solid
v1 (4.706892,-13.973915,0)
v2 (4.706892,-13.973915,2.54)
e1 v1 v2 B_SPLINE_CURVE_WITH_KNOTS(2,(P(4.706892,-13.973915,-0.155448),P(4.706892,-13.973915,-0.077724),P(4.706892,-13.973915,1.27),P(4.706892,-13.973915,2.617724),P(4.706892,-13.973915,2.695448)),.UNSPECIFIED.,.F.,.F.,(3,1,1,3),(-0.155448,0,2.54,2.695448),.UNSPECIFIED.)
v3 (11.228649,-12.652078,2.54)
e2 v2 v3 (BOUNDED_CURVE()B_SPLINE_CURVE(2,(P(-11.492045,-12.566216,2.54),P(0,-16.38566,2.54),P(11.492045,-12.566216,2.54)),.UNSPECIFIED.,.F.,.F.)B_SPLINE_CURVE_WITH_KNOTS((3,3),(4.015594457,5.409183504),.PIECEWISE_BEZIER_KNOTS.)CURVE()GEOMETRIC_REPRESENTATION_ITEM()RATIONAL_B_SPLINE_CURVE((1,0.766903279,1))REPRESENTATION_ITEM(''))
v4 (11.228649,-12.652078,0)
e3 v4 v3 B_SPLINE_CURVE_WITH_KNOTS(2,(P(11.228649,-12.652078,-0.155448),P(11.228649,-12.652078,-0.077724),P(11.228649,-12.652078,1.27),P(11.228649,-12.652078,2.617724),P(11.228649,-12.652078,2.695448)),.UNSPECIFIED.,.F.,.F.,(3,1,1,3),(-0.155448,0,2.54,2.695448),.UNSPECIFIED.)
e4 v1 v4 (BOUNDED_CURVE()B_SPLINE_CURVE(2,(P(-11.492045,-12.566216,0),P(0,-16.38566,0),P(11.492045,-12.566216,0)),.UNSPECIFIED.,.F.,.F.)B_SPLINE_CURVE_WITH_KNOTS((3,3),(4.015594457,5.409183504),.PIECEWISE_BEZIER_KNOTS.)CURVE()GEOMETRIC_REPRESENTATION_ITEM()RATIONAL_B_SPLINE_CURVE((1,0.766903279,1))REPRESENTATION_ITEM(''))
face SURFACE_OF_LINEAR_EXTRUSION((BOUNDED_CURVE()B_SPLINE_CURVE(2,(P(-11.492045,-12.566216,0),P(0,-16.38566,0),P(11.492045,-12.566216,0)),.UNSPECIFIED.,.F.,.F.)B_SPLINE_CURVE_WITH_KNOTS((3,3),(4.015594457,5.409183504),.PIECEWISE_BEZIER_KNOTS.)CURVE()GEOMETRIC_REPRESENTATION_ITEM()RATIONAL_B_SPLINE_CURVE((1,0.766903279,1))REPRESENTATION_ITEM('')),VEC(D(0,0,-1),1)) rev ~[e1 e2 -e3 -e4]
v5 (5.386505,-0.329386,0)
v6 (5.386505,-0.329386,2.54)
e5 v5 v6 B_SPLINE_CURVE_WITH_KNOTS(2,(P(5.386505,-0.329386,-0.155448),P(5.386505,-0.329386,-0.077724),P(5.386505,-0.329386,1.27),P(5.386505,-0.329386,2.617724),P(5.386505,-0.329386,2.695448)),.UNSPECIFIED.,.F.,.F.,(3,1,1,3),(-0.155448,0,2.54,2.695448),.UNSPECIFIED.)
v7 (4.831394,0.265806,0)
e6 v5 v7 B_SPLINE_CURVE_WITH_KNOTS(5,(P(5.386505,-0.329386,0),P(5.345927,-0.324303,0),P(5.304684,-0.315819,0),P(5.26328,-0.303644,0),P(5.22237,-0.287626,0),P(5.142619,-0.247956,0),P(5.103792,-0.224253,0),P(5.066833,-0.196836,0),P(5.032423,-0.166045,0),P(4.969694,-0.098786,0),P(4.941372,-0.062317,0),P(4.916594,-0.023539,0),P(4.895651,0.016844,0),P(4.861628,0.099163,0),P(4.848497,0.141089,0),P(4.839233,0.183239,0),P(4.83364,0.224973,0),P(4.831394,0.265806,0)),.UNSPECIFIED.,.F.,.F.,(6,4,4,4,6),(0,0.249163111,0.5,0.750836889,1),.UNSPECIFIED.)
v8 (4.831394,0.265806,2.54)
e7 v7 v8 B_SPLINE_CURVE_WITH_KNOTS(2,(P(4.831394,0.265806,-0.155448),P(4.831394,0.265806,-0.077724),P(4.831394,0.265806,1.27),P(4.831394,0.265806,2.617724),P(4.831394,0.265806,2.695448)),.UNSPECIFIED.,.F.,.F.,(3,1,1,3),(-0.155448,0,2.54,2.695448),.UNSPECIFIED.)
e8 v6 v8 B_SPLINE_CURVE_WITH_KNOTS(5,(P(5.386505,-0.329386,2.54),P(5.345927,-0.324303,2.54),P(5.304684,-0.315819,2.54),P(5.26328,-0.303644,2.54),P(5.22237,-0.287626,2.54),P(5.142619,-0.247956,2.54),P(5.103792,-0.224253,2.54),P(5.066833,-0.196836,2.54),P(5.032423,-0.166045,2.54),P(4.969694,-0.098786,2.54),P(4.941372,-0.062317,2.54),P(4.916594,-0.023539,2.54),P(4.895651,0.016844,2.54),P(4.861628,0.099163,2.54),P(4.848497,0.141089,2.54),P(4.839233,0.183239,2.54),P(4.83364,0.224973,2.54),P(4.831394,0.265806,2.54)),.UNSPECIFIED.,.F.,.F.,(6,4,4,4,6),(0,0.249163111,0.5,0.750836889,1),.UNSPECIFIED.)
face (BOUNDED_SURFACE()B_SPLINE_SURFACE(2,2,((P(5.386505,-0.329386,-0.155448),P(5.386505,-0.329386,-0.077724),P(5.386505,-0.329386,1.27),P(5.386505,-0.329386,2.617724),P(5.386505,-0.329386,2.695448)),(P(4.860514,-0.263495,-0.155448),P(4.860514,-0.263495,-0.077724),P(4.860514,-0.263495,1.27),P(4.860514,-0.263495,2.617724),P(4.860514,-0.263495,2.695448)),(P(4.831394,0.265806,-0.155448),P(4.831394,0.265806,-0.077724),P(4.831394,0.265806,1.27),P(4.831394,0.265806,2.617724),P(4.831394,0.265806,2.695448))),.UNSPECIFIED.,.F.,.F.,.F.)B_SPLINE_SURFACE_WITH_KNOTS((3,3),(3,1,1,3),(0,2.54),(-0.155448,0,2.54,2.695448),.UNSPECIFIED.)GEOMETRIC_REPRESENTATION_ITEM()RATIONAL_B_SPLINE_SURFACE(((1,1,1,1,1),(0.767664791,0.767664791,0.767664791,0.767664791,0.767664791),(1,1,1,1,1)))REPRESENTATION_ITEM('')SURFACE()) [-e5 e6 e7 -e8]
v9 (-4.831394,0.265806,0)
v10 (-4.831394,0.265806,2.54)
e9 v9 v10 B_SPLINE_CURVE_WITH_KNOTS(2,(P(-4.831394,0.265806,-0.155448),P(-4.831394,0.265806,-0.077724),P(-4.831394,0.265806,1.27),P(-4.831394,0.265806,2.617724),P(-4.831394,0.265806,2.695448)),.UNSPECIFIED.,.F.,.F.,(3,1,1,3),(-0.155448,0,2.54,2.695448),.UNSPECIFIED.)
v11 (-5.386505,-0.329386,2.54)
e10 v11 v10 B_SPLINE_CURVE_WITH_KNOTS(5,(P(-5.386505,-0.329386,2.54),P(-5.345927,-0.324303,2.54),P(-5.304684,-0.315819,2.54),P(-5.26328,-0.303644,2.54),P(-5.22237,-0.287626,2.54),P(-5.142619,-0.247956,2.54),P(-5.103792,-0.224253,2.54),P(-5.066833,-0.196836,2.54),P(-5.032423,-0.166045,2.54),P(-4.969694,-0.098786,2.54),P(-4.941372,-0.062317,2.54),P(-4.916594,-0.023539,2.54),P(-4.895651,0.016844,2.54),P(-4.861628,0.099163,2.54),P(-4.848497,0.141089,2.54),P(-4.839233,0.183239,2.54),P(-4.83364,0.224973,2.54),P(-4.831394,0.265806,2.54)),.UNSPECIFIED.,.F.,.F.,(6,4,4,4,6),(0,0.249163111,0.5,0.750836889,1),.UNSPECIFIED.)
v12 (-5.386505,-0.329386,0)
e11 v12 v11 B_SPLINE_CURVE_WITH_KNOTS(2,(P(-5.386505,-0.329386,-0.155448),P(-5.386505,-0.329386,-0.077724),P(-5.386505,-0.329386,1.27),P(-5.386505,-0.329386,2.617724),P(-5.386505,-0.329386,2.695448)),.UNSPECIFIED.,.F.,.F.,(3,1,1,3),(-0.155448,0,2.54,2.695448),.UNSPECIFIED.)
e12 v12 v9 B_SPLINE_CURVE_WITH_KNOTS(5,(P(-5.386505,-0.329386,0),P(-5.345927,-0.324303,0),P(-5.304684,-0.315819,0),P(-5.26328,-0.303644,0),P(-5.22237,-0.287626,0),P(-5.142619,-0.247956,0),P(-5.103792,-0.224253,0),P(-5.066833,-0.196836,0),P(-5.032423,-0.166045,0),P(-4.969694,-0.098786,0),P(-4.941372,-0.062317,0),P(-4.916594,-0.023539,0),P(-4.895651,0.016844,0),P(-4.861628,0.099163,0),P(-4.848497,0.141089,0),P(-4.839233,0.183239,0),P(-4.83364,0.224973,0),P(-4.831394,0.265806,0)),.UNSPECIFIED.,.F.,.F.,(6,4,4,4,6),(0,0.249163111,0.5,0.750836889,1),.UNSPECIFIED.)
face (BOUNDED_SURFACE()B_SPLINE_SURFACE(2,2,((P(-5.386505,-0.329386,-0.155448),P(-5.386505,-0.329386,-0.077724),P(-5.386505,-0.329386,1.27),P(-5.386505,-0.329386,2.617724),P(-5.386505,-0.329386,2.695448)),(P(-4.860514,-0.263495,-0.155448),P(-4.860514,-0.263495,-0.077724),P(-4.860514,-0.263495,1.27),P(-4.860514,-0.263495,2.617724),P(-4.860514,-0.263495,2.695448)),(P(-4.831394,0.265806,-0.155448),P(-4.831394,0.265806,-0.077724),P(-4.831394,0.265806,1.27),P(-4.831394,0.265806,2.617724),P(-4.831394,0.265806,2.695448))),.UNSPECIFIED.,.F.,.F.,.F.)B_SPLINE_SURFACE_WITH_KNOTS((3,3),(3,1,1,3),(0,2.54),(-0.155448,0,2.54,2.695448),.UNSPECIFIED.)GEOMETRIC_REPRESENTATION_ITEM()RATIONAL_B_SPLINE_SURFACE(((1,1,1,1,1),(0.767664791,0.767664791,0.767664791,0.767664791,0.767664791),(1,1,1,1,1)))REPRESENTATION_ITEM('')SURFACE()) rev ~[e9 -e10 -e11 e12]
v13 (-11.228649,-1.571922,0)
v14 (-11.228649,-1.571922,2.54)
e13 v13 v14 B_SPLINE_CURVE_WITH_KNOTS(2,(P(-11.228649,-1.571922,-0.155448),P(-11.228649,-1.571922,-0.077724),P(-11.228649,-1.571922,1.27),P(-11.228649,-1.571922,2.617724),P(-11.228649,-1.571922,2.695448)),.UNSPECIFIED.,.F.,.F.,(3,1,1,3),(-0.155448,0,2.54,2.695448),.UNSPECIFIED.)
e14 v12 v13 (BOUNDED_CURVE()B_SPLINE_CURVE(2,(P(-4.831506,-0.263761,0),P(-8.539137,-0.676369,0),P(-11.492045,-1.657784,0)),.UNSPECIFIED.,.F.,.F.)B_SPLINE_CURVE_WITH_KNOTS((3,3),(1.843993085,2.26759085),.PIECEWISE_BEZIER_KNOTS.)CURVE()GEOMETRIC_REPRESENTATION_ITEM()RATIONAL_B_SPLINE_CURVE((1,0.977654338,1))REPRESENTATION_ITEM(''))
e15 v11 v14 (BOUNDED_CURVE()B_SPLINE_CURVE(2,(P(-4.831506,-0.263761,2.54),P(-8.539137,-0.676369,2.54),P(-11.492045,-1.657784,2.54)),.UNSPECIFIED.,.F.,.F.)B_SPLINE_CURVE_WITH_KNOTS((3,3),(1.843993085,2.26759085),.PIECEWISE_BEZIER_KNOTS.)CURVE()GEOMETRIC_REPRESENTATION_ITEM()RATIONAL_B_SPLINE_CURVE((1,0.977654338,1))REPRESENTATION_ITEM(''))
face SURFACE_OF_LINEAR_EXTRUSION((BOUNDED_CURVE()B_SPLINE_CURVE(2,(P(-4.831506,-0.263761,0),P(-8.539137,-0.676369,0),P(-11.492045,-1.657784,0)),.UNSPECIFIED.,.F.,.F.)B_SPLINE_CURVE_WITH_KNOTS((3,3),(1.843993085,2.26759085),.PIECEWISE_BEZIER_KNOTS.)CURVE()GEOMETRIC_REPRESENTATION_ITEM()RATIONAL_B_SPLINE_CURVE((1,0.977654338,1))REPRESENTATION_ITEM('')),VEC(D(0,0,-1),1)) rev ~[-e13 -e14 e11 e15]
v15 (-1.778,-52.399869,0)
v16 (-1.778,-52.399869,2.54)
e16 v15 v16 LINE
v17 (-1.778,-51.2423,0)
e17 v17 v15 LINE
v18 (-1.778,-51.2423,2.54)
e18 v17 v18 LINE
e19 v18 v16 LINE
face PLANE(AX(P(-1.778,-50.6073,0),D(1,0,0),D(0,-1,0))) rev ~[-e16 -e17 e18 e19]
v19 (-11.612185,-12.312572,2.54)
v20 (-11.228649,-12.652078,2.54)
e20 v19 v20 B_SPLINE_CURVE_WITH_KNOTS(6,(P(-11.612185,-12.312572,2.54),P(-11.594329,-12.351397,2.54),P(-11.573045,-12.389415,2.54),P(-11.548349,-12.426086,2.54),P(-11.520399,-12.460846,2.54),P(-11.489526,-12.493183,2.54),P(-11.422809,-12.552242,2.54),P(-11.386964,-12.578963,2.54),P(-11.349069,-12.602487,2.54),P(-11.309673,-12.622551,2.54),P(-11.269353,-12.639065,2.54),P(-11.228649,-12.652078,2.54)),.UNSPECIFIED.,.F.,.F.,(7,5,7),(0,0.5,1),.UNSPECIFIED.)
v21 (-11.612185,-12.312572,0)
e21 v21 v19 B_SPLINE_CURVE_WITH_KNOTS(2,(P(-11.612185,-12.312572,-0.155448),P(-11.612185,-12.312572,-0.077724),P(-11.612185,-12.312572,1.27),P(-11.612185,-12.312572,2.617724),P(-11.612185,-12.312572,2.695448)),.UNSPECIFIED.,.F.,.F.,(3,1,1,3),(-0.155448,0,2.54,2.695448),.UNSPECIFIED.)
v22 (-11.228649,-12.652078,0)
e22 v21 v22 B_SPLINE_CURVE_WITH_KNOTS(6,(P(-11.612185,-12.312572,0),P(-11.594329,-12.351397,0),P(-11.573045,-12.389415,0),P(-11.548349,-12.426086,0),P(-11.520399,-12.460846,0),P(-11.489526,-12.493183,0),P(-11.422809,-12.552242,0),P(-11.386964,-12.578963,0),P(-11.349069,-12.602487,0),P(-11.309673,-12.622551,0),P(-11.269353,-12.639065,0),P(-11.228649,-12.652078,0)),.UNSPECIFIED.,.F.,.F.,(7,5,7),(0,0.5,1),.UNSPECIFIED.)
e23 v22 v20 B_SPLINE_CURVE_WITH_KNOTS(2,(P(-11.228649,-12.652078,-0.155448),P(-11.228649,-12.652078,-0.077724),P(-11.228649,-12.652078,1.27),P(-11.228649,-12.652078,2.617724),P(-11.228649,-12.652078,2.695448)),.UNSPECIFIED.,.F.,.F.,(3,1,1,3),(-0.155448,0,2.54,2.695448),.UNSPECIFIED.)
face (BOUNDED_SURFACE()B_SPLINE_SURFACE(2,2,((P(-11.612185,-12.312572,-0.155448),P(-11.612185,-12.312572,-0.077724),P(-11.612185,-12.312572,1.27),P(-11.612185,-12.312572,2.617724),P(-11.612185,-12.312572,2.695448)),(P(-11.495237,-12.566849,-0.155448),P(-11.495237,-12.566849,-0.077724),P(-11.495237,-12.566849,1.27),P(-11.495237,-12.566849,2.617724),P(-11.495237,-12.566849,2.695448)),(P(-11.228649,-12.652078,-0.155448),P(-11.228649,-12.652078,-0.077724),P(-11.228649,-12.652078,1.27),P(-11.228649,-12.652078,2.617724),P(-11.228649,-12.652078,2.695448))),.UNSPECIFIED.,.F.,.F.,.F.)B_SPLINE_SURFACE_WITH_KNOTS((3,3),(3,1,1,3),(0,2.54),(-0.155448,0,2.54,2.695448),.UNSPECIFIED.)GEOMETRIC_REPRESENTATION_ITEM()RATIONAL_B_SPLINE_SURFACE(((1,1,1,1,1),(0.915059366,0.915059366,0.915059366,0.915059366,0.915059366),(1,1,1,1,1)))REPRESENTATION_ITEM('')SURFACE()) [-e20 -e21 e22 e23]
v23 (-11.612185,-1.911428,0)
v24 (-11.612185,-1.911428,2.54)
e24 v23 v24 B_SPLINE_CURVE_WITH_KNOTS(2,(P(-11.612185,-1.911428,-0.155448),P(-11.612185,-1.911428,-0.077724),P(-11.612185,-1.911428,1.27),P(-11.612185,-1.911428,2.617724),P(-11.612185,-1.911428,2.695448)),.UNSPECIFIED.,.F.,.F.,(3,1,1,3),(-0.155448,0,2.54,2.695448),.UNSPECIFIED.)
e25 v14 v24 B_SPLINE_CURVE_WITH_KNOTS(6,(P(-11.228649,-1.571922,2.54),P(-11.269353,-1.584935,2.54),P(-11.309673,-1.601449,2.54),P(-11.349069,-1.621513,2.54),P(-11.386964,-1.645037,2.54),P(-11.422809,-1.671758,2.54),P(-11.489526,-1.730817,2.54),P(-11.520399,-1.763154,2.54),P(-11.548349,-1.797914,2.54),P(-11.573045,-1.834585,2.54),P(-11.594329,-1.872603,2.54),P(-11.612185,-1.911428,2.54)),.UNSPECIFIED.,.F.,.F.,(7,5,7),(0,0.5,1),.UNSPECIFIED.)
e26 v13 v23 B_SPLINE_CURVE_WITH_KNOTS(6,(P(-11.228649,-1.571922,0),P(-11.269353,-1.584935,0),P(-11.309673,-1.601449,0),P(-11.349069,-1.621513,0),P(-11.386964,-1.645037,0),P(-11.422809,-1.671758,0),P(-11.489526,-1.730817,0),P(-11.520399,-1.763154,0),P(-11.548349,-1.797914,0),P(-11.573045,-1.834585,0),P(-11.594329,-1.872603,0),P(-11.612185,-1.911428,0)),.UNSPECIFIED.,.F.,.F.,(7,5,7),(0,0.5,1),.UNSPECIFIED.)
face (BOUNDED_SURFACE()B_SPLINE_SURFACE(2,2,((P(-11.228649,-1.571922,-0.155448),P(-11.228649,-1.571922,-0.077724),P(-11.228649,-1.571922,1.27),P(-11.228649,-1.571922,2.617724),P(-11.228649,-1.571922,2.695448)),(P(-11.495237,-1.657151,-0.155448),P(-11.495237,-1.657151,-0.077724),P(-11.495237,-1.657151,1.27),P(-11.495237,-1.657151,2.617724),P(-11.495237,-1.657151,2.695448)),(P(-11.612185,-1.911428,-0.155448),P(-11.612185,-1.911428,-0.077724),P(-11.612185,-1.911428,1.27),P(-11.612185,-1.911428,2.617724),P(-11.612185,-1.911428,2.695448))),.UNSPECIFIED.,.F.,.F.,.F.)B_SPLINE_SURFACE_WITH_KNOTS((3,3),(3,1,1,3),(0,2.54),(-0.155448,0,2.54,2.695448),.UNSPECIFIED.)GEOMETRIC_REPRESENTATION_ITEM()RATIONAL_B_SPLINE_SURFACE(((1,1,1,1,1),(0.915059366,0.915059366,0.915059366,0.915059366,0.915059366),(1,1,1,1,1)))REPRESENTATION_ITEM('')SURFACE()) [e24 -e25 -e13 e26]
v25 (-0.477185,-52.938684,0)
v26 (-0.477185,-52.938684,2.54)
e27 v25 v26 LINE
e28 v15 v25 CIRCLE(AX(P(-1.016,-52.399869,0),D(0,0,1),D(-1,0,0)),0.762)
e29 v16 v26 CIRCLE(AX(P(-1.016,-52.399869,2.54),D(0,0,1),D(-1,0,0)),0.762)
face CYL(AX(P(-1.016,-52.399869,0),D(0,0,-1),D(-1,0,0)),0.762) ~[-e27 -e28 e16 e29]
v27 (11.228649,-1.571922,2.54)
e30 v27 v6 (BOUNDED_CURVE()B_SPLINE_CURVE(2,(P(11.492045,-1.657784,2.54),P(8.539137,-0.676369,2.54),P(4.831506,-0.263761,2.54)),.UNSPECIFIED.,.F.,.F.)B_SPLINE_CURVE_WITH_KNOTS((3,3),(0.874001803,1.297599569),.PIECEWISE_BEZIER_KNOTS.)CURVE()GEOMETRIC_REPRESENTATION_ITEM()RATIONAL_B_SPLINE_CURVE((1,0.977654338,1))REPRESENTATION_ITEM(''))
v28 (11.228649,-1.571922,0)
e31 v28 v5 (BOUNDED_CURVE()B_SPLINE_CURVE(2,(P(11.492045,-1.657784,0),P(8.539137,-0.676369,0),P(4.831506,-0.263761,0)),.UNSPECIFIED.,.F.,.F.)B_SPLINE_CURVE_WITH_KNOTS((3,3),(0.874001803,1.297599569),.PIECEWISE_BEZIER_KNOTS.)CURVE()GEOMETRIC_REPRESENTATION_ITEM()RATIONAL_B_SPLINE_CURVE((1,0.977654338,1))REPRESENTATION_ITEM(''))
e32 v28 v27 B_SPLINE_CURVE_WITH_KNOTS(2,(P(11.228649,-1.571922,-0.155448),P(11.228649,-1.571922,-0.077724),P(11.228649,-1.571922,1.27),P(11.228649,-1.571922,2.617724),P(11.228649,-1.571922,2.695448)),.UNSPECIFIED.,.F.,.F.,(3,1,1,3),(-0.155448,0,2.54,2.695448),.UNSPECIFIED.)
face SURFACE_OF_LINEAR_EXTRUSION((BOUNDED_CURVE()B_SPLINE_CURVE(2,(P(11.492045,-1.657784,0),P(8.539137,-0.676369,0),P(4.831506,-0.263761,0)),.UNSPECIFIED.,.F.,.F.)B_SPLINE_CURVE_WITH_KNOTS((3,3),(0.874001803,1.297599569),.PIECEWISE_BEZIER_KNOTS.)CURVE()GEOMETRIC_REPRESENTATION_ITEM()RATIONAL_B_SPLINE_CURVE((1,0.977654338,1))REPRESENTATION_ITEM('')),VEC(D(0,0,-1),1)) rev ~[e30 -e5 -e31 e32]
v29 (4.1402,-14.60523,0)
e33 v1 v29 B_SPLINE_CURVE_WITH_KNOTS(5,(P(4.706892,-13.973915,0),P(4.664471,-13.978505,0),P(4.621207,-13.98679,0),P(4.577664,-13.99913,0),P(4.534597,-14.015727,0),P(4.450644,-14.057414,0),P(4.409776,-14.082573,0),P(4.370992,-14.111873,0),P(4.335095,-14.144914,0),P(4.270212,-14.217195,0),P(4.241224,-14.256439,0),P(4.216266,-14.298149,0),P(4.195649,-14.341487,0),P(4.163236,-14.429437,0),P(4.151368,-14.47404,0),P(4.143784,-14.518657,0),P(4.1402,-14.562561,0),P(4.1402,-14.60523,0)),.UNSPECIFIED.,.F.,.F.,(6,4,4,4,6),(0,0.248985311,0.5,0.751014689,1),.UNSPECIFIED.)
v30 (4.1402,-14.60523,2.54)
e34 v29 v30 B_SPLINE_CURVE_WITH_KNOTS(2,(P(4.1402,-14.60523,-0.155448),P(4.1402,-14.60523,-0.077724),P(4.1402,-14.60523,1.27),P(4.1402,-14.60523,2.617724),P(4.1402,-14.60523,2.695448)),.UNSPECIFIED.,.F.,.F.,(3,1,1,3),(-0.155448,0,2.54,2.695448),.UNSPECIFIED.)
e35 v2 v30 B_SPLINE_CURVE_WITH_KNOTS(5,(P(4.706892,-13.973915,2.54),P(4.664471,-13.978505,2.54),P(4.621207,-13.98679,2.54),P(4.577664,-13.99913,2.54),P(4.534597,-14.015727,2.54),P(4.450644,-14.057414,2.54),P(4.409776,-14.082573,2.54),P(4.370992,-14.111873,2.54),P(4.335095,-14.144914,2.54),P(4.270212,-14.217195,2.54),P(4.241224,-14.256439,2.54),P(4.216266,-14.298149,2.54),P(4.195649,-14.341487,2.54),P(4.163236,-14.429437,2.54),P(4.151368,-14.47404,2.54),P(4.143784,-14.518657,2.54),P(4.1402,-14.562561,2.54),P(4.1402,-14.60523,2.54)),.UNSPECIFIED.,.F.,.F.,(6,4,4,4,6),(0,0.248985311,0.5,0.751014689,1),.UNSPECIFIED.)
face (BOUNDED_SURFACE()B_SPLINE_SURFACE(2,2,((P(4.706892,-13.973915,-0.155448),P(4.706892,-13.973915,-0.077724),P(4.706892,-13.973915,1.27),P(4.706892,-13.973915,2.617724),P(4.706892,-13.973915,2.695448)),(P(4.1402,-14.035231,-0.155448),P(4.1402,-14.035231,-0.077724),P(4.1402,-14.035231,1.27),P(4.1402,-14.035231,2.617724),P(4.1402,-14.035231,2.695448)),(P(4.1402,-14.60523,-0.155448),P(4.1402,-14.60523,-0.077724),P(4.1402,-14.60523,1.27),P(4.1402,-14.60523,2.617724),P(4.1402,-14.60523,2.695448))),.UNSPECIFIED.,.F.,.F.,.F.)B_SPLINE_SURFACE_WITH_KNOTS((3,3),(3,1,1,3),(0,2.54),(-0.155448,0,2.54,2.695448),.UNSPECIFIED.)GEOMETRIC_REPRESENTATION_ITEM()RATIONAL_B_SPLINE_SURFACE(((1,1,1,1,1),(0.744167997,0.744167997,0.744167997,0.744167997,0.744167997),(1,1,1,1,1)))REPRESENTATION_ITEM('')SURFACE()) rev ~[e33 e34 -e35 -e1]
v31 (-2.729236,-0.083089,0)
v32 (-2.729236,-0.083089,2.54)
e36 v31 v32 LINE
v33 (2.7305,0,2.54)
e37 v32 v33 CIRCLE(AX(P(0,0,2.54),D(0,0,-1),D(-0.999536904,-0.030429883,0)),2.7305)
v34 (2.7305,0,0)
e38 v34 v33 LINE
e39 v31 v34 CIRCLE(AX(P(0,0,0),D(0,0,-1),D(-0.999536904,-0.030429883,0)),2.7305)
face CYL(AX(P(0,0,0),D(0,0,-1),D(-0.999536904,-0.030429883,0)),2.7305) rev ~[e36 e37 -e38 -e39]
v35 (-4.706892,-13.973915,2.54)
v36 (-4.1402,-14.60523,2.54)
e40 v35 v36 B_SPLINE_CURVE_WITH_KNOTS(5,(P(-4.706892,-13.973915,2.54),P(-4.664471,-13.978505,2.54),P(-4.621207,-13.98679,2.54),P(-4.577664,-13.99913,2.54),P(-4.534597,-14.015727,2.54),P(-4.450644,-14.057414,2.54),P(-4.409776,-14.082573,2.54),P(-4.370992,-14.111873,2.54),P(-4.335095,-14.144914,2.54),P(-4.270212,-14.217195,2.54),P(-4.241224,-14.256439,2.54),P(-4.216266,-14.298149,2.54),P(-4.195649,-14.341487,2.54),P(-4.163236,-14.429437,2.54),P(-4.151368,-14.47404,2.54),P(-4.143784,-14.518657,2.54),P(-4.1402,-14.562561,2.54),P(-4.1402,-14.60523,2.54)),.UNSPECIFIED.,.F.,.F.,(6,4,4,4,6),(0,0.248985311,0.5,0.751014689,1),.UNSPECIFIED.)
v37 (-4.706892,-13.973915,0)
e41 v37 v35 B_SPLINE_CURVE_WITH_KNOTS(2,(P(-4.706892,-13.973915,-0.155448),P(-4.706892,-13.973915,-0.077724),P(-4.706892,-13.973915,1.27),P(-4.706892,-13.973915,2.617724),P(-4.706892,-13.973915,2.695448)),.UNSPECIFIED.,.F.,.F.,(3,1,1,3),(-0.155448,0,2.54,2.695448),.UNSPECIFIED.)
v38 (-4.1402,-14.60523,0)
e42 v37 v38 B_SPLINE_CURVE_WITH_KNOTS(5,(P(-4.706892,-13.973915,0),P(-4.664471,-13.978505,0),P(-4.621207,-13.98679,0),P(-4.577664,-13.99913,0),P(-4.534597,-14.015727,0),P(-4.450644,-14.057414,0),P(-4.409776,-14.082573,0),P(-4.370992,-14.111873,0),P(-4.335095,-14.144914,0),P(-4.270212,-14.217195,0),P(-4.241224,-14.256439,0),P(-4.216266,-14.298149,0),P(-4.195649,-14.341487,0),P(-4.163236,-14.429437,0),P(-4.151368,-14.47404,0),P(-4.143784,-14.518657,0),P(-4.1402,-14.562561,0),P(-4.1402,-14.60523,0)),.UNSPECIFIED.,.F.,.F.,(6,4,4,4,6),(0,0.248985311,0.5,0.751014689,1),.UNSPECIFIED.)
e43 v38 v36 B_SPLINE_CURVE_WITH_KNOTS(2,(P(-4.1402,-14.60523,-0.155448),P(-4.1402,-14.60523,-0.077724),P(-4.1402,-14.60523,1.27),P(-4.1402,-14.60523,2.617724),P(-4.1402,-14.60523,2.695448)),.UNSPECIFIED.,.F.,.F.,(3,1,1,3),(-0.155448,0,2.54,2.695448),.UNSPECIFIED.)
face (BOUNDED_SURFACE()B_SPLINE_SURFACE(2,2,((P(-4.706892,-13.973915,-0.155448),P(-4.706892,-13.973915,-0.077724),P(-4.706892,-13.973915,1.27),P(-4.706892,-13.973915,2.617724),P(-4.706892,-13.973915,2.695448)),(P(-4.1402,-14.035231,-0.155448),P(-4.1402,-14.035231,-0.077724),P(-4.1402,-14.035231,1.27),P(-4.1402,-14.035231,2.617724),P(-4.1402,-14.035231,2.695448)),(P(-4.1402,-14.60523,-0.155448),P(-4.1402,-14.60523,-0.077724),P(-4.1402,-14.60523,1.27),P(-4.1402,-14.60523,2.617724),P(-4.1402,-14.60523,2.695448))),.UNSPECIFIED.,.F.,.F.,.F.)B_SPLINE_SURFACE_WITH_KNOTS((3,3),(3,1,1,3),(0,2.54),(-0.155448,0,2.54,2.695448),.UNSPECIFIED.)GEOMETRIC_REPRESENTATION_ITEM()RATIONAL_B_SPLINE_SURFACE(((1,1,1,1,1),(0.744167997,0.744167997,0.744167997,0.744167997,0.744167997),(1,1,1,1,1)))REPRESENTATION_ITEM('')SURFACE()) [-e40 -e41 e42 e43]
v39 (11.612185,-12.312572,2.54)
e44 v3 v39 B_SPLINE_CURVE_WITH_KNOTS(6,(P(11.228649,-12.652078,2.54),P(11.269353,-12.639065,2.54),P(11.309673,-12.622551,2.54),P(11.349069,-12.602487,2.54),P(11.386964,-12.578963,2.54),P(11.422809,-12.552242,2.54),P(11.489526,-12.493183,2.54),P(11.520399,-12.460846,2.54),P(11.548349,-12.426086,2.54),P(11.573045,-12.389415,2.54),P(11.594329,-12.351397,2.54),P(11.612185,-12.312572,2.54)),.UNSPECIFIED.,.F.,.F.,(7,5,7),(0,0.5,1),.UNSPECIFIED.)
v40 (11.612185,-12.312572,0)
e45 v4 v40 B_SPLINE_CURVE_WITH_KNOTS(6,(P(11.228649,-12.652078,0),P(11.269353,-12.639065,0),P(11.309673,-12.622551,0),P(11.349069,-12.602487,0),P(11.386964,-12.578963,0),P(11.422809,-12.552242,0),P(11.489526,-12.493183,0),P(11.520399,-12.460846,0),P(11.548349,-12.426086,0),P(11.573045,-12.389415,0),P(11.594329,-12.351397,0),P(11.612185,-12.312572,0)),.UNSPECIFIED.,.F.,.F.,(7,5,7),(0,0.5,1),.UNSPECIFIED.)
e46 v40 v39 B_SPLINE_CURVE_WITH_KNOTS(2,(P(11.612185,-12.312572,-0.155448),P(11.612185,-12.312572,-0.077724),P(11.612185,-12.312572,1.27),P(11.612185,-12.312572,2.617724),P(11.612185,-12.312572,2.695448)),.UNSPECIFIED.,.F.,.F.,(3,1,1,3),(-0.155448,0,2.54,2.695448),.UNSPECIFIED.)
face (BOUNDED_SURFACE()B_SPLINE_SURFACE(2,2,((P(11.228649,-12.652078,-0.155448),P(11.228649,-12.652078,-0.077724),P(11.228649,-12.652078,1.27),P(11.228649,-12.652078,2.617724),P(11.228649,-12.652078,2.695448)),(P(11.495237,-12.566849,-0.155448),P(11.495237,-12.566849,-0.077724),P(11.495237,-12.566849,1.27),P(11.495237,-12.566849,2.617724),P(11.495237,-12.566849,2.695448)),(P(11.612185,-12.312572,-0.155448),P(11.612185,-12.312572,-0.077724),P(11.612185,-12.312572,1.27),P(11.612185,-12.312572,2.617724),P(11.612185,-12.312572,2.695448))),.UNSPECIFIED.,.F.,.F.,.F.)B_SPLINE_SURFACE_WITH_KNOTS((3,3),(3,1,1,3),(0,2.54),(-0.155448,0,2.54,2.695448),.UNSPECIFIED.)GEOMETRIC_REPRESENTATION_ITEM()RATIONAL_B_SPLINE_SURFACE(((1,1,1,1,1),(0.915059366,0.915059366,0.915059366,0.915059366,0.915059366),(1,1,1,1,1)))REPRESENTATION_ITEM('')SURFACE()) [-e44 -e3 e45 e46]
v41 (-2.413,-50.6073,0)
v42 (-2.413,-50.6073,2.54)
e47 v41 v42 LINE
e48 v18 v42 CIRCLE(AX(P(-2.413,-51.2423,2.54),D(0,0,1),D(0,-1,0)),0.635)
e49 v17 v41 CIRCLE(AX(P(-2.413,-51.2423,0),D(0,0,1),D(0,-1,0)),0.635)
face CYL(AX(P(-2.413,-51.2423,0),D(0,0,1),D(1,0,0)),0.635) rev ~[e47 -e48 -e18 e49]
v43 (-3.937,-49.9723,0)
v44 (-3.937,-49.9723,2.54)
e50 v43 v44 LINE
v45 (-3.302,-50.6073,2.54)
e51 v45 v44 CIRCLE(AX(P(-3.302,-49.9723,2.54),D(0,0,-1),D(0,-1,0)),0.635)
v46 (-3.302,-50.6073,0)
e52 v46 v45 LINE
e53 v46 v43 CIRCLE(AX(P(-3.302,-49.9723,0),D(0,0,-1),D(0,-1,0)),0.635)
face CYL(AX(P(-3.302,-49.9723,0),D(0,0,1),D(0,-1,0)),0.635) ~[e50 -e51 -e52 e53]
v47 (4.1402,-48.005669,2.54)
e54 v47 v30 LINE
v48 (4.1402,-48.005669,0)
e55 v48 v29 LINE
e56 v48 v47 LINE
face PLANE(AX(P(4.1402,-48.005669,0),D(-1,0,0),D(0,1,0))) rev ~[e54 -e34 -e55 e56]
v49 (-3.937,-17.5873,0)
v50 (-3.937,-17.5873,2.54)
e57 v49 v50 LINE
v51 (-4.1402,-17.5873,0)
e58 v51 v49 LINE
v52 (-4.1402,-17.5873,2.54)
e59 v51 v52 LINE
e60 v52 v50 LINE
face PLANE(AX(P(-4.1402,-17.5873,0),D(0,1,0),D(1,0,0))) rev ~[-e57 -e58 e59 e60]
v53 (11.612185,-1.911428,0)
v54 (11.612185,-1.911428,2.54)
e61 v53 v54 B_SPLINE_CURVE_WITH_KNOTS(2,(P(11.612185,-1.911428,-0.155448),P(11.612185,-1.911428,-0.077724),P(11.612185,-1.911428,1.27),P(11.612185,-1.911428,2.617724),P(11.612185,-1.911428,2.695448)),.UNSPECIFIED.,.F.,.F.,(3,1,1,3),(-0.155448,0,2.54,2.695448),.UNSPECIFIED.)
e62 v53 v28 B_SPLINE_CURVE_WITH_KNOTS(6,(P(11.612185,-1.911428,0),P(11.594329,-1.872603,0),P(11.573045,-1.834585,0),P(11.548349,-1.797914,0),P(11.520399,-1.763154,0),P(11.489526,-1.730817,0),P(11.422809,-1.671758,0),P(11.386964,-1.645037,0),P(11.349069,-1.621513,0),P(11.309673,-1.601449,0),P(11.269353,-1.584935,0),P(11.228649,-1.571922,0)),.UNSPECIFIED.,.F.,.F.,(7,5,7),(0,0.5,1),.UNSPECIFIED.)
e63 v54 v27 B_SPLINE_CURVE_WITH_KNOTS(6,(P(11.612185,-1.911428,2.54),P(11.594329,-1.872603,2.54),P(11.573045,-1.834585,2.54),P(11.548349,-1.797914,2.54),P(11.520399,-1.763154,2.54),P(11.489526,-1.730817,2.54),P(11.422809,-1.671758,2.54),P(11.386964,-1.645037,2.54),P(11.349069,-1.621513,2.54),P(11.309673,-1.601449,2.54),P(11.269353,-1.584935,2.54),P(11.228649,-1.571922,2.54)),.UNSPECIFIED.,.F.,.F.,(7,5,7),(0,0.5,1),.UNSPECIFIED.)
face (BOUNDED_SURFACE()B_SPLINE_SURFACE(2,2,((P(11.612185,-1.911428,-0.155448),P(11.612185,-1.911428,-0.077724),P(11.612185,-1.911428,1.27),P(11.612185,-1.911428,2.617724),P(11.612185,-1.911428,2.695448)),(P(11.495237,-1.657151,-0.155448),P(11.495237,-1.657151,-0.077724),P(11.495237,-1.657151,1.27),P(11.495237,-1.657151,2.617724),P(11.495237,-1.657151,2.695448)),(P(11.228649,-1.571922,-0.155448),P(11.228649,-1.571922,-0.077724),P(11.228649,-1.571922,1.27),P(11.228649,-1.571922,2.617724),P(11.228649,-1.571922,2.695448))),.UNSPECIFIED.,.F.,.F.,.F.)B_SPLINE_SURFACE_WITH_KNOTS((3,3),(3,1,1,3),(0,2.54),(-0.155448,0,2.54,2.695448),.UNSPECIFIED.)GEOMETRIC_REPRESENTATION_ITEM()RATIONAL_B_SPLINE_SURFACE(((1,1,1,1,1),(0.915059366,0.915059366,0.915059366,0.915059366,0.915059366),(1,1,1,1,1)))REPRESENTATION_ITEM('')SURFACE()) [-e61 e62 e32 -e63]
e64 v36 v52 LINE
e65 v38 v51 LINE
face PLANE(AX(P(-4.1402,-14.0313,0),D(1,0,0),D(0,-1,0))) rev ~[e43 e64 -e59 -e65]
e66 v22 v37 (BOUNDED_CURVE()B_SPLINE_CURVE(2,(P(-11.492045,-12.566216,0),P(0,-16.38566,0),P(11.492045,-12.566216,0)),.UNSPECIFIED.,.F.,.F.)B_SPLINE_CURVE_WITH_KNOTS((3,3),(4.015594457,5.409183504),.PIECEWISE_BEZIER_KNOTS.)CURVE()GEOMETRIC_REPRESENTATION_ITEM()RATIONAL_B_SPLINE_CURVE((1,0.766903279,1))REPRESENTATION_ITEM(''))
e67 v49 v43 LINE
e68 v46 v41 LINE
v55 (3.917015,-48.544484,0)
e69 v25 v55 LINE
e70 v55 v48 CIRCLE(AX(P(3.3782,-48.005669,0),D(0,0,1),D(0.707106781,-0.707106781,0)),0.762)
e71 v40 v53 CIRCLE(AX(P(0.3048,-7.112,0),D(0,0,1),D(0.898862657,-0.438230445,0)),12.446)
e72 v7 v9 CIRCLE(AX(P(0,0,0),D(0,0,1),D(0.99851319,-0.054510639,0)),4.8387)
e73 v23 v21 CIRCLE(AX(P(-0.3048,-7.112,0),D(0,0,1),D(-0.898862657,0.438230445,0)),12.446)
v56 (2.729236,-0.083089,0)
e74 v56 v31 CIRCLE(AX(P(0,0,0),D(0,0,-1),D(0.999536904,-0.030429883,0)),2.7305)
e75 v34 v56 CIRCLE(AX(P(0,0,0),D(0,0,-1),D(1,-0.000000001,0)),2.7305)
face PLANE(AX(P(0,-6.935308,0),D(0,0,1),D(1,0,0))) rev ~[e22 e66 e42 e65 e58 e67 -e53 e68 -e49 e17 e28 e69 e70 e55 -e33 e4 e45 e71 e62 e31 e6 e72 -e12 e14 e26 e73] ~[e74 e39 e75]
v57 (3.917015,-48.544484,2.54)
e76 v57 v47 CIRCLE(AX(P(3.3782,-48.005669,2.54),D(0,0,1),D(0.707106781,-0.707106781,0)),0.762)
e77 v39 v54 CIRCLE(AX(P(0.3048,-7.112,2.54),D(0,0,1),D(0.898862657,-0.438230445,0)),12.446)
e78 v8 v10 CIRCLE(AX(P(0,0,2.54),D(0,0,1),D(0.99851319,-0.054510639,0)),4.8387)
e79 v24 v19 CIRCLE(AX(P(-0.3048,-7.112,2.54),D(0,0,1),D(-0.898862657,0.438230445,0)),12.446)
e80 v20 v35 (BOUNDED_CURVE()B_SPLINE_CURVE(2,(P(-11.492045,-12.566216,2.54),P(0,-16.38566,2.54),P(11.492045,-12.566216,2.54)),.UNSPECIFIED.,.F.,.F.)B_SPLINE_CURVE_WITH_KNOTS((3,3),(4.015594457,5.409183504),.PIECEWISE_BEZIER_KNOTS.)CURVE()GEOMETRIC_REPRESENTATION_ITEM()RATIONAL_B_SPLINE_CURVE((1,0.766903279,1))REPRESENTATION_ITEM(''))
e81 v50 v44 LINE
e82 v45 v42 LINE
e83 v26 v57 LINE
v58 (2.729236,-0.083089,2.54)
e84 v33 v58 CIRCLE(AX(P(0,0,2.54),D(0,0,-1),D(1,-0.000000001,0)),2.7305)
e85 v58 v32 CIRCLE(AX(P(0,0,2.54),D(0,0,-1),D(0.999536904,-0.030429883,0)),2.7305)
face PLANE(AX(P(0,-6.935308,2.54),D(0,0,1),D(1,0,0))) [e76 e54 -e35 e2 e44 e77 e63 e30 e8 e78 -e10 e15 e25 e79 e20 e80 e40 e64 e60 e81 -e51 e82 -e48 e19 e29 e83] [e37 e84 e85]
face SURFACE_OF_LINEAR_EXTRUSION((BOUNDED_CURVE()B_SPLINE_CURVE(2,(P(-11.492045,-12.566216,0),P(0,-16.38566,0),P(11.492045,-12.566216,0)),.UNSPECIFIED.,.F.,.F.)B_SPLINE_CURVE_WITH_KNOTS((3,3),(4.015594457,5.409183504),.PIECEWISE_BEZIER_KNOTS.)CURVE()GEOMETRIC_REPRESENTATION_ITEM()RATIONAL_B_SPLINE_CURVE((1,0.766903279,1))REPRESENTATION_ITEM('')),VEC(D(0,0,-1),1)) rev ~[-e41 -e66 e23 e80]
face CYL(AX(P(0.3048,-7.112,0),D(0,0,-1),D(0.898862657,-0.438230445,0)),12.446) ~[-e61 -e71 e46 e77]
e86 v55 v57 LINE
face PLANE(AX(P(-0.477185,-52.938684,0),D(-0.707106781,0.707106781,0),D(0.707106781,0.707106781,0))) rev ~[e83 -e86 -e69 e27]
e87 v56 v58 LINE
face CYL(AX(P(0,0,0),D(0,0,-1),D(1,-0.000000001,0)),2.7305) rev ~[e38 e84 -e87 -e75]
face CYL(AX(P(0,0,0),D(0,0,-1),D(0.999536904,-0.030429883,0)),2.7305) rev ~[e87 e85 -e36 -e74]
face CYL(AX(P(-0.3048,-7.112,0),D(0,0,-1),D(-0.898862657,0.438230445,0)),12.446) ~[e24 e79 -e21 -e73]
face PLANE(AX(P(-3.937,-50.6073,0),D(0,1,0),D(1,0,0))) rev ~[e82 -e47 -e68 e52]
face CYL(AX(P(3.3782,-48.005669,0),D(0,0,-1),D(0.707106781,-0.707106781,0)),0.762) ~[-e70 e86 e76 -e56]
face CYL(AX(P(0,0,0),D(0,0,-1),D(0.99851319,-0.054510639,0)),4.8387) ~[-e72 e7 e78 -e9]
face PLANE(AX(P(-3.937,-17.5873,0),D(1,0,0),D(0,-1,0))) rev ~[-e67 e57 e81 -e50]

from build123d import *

# Parameters (mm, degrees)
F1_DEPTH = 2.54
F3_DEPTH = 2.54
F4_R     = 0.635


with BuildPart() as f1:
    # F0 (on Top) → F1 (new body)
    with BuildSketch(Plane.XY):
        with BuildLine():
            ThreePointArc((2.7292355161, -0.0830887952), (0, -2.7305), (-2.7292355161, -0.0830887952))
            add(Edge.make_bspline(
                [(-2.7292355161, -0.0830887952), (-3.7940557667, -0.1483067369), (-4.8315057716, -0.2637606285)],
                knots=[1.7238043068, 1.7238043068, 1.7238043068, 1.8439930848, 1.8439930848, 1.8439930848], degree=2, weights=[1, 0.9981948755, 1]))
            add(Edge.make_bspline(
                [(-4.8315057716, -0.2637606285), (-8.5391367, -0.6763688673), (-11.4920446345, -1.6577838797)],
                knots=[1.8439930848, 1.8439930848, 1.8439930848, 2.2675908503, 2.2675908503, 2.2675908503], degree=2, weights=[1, 0.9776543376, 1]))
            ThreePointArc((-11.4920446345, -1.6577838797), (-12.7508, -7.112), (-11.4920446345, -12.5662161203))
            add(Edge.make_bspline(
                [(-11.4920446345, -12.5662161203), (0, -16.3856596579), (11.4920446345, -12.5662161203)],
                knots=[4.0155944569, 4.0155944569, 4.0155944569, 5.4091835039, 5.4091835039, 5.4091835039], degree=2, weights=[1, 0.766903279, 1]))
            ThreePointArc((11.4920446345, -12.5662161203), (12.7508, -7.112), (11.4920446345, -1.6577838797))
            add(Edge.make_bspline(
                [(11.4920446345, -1.6577838797), (8.5391367, -0.6763688673), (4.8315057716, -0.2637606285)],
                knots=[0.8740018033, 0.8740018033, 0.8740018033, 1.2975995688, 1.2975995688, 1.2975995688], degree=2, weights=[1, 0.9776543376, 1]))
            add(Edge.make_bspline(
                [(4.8315057716, -0.2637606285), (3.7940557667, -0.1483067369), (2.7292355161, -0.0830887952)],
                knots=[1.2975995688, 1.2975995688, 1.2975995688, 1.4177883468, 1.4177883468, 1.4177883468], degree=2, weights=[1, 0.9981948755, 1]))
        make_face()
        with BuildLine():
            ThreePointArc((-2.7292355161, -0.0830887952), (-0.0415492082, 2.7301838607), (2.7305, 0))
            ThreePointArc((2.7305, 0), (2.7301838607, -0.0415492082), (2.7292355161, -0.0830887952))
            add(Edge.make_bspline(
                [(4.8315057716, -0.2637606285), (3.7940557667, -0.1483067369), (2.7292355161, -0.0830887952)],
                knots=[1.2975995688, 1.2975995688, 1.2975995688, 1.4177883468, 1.4177883468, 1.4177883468], degree=2, weights=[1, 0.9981948755, 1]))
            ThreePointArc((4.8315057716, -0.2637606285), (0, 4.8387), (-4.8315057716, -0.2637606285))
            add(Edge.make_bspline(
                [(-2.7292355161, -0.0830887952), (-3.7940557667, -0.1483067369), (-4.8315057716, -0.2637606285)],
                knots=[1.7238043068, 1.7238043068, 1.7238043068, 1.8439930848, 1.8439930848, 1.8439930848], degree=2, weights=[1, 0.9981948755, 1]))
        make_face()
    extrude(amount=F1_DEPTH)

    # F2 (on Top) → F3 (join, through all)
    with BuildSketch(Plane.XY):
        with BuildLine():
            add(Edge.make_bspline(
                [(-4.1402, -14.0312996195), (0, -14.4220670272), (4.1402, -14.0312996195)],
                knots=[4.4790722282, 4.4790722282, 4.4790722282, 4.9457057325, 4.9457057325, 4.9457057325], degree=2, weights=[1, 0.9729048959, 1]))
            Line((-4.1402, -14.0312996195), (-4.1402, -17.5872996195))
            Line((-4.1402, -17.5872996195), (-3.937, -17.5872996195))
            Line((-3.937, -17.5872996195), (-3.937, -50.6072996195))
            Line((-3.937, -50.6072996195), (-1.778, -50.6072996195))
            Line((-1.778, -50.6072996195), (-1.778, -52.3998688849))
            ThreePointArc((-1.778, -52.3998688849), (-1.3076047755, -53.1038650887), (-0.4771846327, -52.9386842522))
            Line((-0.4771846327, -52.9386842522), (3.9170153673, -48.5444842522))
            ThreePointArc((3.9170153673, -48.5444842522), (4.0821962038, -48.2972736604), (4.1402, -48.0056688849))
            Line((4.1402, -48.0056688849), (4.1402, -14.0312996195))
        make_face()
    extrude(amount=F3_DEPTH)

    # F4
    f4_edges = [f1.edges().sort_by_distance(p)[0] for p in [
        (-4.1402, -14.0313, 1.27),
        (4.1402, -14.0313, 1.27),
        (11.492045, -12.566216, 1.27),
        (11.492045, -1.657784, 1.27),
        (-11.492045, -1.657784, 1.27),
        (-11.492045, -12.566216, 1.27),
        (-3.937, -50.6073, 1.27),
        (-1.778, -50.6073, 1.27),
        (4.831506, -0.263761, 1.27),
        (-4.831506, -0.263761, 1.27),
    ]]
    fillet(f4_edges, radius=F4_R)


solid = f1.part
